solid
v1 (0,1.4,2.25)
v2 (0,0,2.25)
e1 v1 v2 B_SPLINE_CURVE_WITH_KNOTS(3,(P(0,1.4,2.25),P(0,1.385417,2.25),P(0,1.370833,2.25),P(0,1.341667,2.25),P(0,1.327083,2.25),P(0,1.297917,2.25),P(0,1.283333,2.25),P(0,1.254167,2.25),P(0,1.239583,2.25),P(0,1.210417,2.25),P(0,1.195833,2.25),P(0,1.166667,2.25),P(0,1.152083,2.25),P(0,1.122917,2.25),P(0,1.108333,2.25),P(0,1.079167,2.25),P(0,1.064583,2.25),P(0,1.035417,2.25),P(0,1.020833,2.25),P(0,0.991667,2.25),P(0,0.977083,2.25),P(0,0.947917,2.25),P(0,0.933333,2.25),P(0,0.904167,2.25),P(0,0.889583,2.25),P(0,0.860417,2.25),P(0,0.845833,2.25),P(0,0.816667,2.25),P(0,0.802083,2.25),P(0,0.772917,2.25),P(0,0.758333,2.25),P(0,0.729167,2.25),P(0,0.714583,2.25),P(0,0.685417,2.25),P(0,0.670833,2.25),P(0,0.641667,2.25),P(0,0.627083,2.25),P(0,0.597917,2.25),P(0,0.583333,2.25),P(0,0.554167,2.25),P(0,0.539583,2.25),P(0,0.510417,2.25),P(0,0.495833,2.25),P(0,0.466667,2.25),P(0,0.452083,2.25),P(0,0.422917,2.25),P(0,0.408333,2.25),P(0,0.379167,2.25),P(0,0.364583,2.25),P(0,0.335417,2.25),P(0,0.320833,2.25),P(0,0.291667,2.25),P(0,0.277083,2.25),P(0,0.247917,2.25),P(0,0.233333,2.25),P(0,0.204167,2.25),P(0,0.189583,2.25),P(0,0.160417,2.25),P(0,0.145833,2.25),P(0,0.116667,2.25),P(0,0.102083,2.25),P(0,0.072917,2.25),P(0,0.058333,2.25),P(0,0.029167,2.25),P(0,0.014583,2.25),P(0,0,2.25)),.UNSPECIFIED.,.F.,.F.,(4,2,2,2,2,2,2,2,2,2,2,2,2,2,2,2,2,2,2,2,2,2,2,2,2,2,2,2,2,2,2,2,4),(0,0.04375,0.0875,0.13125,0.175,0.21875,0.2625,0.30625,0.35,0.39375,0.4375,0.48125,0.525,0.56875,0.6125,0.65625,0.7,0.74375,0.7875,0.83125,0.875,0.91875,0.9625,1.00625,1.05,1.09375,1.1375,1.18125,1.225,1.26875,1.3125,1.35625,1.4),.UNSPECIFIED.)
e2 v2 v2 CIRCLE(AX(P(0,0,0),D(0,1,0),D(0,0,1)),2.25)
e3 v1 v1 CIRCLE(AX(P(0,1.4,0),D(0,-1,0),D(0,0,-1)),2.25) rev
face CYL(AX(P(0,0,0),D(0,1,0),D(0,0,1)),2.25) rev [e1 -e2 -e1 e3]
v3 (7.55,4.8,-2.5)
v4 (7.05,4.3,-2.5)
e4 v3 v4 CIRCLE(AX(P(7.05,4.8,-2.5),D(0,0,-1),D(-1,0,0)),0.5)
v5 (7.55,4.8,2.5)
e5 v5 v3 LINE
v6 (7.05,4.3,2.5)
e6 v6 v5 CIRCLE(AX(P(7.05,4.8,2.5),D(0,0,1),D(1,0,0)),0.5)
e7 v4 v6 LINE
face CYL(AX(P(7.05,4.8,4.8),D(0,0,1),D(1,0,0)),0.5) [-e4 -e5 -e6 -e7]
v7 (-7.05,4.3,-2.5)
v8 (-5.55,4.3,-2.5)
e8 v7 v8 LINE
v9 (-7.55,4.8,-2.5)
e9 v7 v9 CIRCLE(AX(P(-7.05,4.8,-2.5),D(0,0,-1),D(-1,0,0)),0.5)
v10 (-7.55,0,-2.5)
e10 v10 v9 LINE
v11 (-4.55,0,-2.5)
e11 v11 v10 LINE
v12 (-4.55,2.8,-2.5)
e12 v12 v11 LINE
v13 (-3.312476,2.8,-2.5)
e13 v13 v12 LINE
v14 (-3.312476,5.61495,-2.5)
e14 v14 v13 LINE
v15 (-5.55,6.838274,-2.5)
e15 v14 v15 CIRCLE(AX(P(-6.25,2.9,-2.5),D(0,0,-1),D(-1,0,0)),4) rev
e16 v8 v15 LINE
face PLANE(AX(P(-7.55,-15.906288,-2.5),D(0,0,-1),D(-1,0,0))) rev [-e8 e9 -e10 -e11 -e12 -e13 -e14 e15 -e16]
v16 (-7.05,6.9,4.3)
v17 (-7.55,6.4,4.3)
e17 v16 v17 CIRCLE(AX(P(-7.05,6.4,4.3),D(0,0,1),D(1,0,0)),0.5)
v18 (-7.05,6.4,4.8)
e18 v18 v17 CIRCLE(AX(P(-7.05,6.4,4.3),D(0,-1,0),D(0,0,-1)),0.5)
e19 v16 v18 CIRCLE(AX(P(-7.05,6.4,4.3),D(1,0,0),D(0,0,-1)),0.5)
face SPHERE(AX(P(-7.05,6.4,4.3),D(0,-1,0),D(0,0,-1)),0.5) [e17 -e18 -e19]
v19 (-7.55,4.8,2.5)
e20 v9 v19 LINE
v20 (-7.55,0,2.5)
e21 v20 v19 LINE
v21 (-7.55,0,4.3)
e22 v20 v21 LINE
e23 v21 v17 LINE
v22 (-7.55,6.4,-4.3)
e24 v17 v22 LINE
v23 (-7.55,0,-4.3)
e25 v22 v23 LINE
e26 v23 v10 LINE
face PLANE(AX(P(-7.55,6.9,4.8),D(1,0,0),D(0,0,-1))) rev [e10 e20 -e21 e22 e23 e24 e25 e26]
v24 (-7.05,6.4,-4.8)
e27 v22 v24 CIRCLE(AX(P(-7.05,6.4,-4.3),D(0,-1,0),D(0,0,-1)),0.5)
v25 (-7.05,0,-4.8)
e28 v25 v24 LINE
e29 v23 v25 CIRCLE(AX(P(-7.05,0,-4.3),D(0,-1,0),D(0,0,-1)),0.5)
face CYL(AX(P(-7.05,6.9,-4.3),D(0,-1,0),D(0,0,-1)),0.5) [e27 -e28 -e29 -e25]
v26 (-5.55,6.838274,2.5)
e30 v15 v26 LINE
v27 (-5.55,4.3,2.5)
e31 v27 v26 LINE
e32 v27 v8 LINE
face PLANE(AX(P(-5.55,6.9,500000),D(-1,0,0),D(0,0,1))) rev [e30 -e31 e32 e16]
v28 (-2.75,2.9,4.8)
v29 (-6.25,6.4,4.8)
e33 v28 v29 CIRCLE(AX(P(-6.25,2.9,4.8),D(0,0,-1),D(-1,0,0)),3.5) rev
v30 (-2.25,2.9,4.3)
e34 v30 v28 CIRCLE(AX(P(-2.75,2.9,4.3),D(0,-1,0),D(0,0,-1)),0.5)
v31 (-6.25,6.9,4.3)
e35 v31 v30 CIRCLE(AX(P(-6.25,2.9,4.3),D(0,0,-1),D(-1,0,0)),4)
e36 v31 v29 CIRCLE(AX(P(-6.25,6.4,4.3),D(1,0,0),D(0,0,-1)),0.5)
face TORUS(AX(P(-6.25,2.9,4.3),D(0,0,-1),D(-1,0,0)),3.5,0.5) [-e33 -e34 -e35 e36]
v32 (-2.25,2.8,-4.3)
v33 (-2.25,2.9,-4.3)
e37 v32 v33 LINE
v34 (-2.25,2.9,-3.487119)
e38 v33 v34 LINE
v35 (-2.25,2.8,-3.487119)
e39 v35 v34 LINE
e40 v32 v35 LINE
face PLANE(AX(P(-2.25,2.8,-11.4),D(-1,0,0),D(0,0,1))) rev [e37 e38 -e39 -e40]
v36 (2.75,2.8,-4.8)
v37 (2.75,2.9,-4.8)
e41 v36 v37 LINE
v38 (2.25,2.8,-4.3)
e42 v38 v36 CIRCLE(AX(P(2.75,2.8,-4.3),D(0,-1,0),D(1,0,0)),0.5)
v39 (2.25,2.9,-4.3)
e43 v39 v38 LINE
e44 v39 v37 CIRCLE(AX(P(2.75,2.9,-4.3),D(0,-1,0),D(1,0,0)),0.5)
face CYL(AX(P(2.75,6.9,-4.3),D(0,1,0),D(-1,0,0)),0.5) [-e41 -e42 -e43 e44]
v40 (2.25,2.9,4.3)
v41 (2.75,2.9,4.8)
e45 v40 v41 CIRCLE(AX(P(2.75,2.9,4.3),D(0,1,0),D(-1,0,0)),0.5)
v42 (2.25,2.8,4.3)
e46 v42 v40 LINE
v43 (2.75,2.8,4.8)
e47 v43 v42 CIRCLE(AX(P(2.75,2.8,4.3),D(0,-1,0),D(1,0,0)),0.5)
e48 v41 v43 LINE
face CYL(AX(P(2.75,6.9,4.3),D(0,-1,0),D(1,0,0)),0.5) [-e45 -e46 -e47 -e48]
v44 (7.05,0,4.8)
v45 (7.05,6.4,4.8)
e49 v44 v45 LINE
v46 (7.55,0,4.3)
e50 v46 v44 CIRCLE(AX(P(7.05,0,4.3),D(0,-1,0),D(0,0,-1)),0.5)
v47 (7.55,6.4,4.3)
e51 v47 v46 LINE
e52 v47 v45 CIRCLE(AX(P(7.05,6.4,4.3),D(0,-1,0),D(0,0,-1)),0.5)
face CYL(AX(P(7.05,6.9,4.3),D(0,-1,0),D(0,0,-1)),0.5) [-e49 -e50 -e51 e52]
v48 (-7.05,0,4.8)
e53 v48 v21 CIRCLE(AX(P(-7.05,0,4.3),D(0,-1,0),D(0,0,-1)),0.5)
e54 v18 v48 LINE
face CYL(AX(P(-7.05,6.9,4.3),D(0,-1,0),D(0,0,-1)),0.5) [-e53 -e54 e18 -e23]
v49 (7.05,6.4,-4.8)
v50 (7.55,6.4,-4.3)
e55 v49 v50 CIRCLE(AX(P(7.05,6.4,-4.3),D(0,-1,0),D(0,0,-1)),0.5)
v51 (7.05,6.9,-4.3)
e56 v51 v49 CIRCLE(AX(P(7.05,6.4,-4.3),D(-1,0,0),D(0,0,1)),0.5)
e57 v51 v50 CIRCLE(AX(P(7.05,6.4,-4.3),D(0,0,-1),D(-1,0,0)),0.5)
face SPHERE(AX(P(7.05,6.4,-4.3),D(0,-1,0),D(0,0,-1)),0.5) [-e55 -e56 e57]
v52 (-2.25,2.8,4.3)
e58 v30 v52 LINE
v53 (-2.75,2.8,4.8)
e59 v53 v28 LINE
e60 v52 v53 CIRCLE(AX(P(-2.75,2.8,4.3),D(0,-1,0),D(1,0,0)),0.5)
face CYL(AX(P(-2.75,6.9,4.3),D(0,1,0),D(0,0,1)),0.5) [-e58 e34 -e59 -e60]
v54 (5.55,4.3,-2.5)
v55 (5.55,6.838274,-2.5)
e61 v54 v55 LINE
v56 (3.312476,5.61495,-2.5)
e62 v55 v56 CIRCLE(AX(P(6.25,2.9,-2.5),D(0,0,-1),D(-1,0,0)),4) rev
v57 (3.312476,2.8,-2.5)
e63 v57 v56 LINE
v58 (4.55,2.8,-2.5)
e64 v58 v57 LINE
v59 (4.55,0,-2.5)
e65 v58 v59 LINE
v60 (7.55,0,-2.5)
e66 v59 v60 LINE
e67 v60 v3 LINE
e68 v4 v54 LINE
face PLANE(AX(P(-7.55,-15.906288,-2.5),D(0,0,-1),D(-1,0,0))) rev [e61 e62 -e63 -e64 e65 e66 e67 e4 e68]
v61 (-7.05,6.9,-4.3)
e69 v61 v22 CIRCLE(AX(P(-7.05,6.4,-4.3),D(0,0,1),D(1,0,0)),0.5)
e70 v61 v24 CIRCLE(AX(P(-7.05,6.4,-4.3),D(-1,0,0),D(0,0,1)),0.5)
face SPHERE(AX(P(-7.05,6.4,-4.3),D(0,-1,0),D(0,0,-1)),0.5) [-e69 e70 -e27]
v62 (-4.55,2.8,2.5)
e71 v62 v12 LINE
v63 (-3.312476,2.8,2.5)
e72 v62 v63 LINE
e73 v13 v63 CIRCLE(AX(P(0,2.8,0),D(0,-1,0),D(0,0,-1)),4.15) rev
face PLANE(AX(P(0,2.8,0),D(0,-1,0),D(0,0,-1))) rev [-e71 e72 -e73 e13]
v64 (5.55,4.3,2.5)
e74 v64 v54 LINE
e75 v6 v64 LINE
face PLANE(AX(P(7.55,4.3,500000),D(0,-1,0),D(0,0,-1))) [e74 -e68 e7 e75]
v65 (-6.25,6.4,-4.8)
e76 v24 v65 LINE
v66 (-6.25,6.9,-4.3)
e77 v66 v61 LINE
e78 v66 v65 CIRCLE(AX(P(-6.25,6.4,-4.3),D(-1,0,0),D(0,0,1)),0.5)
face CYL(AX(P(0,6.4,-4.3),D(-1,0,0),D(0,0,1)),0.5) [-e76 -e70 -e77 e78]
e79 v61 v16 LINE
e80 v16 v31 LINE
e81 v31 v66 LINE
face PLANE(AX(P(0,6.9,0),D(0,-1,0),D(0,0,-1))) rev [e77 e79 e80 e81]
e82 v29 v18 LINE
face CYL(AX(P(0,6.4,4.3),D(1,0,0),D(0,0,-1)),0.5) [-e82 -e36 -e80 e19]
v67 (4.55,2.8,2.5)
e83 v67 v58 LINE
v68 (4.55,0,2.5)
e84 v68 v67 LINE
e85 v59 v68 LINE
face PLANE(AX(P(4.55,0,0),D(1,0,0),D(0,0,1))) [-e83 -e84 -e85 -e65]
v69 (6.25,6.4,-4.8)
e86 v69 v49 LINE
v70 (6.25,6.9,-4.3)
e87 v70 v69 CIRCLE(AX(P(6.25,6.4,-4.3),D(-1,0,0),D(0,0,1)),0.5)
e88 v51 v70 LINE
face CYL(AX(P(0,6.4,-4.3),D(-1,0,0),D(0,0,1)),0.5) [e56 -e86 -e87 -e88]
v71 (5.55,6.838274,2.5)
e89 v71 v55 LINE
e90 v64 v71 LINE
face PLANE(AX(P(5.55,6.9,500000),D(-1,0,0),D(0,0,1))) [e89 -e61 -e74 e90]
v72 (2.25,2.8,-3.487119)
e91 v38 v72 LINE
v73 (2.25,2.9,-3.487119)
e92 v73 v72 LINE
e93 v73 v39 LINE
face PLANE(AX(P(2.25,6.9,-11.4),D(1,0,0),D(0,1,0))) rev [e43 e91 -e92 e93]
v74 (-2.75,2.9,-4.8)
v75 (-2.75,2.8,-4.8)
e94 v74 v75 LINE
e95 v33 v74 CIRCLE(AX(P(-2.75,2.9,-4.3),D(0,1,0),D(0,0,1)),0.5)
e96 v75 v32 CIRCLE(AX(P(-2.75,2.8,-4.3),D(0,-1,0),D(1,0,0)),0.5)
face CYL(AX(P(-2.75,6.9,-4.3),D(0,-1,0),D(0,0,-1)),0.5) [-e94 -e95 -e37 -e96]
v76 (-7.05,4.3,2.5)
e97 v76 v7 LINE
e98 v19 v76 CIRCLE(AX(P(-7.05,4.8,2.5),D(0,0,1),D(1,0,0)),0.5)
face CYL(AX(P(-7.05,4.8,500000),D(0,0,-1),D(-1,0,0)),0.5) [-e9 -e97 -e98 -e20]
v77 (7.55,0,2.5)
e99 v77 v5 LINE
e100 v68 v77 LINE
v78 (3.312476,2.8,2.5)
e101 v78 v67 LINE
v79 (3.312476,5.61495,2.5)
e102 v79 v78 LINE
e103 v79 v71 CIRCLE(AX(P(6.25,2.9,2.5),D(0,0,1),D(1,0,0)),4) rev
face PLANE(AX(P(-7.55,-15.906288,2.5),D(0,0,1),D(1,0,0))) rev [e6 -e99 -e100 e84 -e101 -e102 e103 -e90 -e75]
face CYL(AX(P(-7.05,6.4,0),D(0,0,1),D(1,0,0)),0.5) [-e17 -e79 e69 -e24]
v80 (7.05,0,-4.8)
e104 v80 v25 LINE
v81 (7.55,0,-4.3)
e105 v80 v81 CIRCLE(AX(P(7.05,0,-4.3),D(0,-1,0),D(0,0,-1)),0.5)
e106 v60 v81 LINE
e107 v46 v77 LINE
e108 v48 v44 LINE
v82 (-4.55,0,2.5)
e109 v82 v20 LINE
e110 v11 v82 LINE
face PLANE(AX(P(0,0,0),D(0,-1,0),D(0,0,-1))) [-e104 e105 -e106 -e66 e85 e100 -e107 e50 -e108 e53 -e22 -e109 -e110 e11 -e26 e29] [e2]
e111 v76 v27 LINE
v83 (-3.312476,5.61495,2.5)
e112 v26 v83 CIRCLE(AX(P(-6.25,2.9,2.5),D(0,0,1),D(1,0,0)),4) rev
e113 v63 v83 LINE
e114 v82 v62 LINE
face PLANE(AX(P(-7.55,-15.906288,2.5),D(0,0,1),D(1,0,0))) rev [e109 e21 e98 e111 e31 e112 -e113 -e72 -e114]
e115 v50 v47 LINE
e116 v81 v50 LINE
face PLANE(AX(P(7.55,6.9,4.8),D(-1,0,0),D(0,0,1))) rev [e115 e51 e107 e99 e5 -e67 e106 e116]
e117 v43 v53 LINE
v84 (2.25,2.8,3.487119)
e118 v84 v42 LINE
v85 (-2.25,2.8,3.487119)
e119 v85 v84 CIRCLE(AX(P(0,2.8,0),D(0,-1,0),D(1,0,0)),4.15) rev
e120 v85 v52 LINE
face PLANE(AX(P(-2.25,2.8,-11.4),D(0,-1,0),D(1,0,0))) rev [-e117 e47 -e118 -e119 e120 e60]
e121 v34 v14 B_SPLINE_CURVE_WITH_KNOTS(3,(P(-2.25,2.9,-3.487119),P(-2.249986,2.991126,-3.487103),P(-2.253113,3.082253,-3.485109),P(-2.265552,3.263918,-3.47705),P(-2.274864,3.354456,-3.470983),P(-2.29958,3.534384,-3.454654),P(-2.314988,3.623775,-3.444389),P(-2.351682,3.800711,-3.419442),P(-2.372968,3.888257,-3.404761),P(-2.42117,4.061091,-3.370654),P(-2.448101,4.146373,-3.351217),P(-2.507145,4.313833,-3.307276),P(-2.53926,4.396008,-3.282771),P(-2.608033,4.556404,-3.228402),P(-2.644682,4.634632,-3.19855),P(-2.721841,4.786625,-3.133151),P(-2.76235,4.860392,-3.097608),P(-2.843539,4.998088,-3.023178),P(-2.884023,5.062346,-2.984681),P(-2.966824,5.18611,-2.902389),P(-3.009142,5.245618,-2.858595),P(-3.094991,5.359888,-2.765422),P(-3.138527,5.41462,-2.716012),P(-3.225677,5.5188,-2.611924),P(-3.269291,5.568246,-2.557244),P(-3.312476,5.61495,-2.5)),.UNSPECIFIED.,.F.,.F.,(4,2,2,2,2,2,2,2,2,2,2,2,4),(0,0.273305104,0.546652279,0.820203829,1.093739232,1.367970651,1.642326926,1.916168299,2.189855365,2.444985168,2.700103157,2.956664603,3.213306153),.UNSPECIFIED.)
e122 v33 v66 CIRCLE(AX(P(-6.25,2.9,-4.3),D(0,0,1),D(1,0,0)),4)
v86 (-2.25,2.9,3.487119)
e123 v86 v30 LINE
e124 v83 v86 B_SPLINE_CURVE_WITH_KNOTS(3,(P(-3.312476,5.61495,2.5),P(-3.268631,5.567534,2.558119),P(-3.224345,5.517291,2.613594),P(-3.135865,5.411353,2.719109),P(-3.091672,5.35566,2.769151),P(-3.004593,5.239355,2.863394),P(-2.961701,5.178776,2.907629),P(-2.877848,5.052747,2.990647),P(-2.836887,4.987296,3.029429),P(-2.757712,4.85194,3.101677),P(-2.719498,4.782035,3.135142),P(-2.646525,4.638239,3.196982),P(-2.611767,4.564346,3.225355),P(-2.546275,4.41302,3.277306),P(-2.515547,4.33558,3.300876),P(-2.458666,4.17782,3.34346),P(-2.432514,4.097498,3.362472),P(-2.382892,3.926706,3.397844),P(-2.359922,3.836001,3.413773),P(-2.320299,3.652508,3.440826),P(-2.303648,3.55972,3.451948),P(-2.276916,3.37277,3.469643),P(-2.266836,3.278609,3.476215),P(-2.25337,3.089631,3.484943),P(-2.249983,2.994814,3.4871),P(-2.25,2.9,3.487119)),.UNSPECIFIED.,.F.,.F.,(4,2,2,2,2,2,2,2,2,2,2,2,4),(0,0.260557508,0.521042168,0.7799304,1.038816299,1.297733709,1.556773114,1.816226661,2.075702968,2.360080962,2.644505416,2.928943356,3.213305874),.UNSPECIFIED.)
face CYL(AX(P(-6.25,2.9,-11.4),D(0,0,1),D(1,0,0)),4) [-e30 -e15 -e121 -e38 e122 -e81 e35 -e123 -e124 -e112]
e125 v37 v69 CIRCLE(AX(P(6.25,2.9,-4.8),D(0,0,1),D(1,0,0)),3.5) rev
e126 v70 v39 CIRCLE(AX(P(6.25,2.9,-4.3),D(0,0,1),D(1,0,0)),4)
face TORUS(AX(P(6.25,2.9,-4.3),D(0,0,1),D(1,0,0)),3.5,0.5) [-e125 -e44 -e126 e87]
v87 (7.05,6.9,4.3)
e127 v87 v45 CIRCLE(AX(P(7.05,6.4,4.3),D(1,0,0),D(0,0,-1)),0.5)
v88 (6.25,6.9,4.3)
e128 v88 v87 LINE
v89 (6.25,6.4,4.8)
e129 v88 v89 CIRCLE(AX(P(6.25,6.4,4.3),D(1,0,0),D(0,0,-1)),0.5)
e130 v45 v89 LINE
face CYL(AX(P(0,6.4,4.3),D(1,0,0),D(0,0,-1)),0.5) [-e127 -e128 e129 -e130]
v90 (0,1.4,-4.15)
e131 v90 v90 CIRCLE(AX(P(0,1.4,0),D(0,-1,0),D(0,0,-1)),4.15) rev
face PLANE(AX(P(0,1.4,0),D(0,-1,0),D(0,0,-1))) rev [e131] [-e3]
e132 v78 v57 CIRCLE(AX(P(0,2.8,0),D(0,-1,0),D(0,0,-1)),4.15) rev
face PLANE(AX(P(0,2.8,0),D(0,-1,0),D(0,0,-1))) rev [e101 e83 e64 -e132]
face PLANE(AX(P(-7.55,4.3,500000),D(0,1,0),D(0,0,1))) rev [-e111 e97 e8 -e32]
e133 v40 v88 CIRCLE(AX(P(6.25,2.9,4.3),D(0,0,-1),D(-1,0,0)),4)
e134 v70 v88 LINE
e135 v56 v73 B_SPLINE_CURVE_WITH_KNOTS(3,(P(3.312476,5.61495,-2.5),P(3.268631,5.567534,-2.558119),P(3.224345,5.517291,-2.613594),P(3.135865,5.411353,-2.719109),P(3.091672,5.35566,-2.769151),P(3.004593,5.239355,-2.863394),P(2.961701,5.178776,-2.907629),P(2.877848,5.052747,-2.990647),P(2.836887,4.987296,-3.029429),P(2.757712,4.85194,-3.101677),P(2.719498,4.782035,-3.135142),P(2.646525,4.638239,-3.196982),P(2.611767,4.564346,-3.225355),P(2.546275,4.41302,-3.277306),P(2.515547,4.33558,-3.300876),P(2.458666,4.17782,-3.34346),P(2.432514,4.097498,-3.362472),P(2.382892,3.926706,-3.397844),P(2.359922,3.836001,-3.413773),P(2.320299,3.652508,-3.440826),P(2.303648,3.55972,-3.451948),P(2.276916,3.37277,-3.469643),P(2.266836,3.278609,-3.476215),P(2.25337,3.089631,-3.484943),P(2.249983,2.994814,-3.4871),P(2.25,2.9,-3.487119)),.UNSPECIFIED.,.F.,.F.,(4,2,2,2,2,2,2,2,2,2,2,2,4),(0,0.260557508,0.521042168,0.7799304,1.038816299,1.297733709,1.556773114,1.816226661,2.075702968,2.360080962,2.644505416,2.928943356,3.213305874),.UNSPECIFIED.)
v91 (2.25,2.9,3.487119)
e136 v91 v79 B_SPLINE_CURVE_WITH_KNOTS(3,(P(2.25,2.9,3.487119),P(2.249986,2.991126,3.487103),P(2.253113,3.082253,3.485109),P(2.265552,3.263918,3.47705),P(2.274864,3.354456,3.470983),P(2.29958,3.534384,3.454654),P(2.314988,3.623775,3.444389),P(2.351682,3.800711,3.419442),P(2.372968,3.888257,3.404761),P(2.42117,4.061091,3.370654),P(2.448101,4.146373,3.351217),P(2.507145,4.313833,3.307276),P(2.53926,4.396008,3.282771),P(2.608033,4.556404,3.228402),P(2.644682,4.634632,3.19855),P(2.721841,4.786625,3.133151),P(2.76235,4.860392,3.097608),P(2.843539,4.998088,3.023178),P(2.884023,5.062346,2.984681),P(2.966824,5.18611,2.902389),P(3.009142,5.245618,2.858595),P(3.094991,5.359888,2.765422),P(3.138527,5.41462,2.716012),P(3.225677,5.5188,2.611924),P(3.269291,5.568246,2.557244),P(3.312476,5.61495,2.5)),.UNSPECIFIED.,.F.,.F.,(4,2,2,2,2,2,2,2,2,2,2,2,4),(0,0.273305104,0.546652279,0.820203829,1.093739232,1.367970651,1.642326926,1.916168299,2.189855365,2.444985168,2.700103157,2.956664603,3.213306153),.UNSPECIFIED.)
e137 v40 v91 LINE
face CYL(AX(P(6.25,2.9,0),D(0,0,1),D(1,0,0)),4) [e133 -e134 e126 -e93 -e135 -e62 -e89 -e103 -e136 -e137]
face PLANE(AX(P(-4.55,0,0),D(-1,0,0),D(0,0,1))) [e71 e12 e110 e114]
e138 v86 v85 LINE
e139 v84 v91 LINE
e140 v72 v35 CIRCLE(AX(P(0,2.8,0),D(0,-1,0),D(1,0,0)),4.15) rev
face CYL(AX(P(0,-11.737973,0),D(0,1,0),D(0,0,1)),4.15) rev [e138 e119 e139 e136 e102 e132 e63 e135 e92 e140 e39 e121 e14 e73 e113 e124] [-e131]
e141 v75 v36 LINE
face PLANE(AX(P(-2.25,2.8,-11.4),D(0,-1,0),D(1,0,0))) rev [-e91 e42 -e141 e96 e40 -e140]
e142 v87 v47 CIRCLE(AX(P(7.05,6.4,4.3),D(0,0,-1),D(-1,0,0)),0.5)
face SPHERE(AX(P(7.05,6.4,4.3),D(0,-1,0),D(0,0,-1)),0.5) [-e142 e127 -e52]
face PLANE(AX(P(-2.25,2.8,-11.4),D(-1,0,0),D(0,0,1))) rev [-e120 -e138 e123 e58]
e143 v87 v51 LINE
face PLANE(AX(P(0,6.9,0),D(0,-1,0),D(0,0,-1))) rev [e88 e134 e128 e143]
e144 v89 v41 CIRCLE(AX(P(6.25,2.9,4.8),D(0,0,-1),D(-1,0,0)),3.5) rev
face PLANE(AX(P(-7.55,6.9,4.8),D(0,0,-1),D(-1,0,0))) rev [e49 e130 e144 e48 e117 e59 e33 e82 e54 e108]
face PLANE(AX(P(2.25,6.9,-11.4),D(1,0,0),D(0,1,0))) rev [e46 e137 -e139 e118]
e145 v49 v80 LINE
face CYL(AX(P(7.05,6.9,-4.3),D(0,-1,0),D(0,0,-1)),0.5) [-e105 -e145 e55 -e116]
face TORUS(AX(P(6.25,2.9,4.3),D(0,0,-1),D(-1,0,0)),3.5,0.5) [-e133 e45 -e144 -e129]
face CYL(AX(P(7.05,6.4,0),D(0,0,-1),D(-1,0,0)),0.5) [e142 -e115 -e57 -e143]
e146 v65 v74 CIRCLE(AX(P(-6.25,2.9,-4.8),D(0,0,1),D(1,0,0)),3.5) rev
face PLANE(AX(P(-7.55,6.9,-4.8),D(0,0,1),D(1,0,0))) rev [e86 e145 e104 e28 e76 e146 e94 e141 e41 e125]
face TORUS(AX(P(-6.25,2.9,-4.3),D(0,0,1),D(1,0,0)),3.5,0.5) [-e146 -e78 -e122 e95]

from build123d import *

# Parameters (mm, degrees)
SKETCH1_W           = 15.1
SKETCH1_H           = 9.6
BOSS_EXTRUDE1_DEPTH = 6.9
SKETCH3_R           = 2.25
CUT_EXTRUDE1_DEPTH  = 12.298340586
SKETCH4_R           = 4.15
CUT_EXTRUDE2_DEPTH  = 5.5
SKETCH5_W           = 15.1
SKETCH5_H           = 5
CUT_EXTRUDE3_DEPTH  = 4.1
SKETCH6_W           = 4.5
SKETCH6_H           = 4.1
CUT_EXTRUDE4_DEPTH  = 11.4
SKETCH9_W           = 5
SKETCH9_H           = 2.8
CUT_EXTRUDE5_DEPTH  = 3
FILLET3_R           = 0.5
BOSS_EXTRUDE2_REACH = 14.566
SKETCH10_W          = 2
SKETCH10_H          = 2.6
FILLET4_R           = 4
FILLET5_R           = 0.5
FILLET6_R           = 0.5


with BuildPart() as part:
    # Sketch1 → Boss-Extrude1 (new body)
    with BuildSketch(Plane(origin=(0, 0, 0), x_dir=(1, 0, 0), z_dir=(0, 1, 0))):
        Rectangle(SKETCH1_W, SKETCH1_H)
    extrude(amount=BOSS_EXTRUDE1_DEPTH)

    # Sketch3 → Cut-Extrude1 (cut, through all)
    with BuildSketch(Plane(origin=(0, 6.9, 0), x_dir=(1, 0, 0), z_dir=(0, 1, 0))):
        with Locations(Location((0, 0, 0), (0, 0, 270))):
            Circle(SKETCH3_R)
    extrude(amount=-CUT_EXTRUDE1_DEPTH, mode=Mode.SUBTRACT)

    # Sketch4 → Cut-Extrude2 (cut)
    with BuildSketch(Plane(origin=(0, 6.9, 0), x_dir=(1, 0, 0), z_dir=(0, 1, 0))):
        with Locations(Location((0, 0, 0), (0, 0, 270))):
            Circle(SKETCH4_R)
    extrude(amount=-CUT_EXTRUDE2_DEPTH, mode=Mode.SUBTRACT)

    # Sketch5 → Cut-Extrude3 (cut)
    with BuildSketch(Plane(origin=(0, 6.9, 0), x_dir=(1, 0, 0), z_dir=(0, 1, 0))):
        Rectangle(SKETCH5_W, SKETCH5_H)
    extrude(amount=-CUT_EXTRUDE3_DEPTH, mode=Mode.SUBTRACT)

    # Sketch6 → Cut-Extrude4 (cut, symmetric)
    with BuildSketch(Plane.XY):
        with Locations((0, 4.85)):
            Rectangle(SKETCH6_W, SKETCH6_H)
    extrude(amount=CUT_EXTRUDE4_DEPTH, both=True, mode=Mode.SUBTRACT)

    # Sketch9 → Cut-Extrude5 (cut)
    with BuildSketch(Plane.ZY.offset(7.55)):
        with Locations((0, 1.4)):
            Rectangle(SKETCH9_W, SKETCH9_H)
    cut_extrude5 = extrude(amount=-CUT_EXTRUDE5_DEPTH, mode=Mode.SUBTRACT)

    # Fillet3
    fillet3_edges = [part.edges().sort_by_distance(p)[0] for p in [
        (7.55, 3.45, 4.8),
        (-7.55, 3.45, 4.8),
        (-7.55, 3.45, -4.8),
        (7.55, 3.45, -4.8),
    ]]
    fillet(fillet3_edges, radius=FILLET3_R)

    # Sketch10 → Boss-Extrude2 (add, up to next)
    with BuildSketch(Plane.XY.offset(-2.5), mode=Mode.PRIVATE) as boss_extrude2_sk1:
        with Locations((-6.55, 5.6)):
            Rectangle(SKETCH10_W, SKETCH10_H)
    boss_extrude2_tool1 = extrude(boss_extrude2_sk1.sketch, amount=BOSS_EXTRUDE2_REACH, mode=Mode.PRIVATE) - part.part
    boss_extrude2 = boss_extrude2_tool1.solids().sort_by_distance((-6.55, 5.6, -2.5))[0]
    add(boss_extrude2)

    # Mirror1: Cut-Extrude5, Boss-Extrude2 across plane
    add(cut_extrude5.mirror(Plane(origin=(0, 0, 0), x_dir=(0, 0, 1), z_dir=(1, 0, 0))), mode=Mode.SUBTRACT)
    add(boss_extrude2.mirror(Plane(origin=(0, 0, 0), x_dir=(0, 0, 1), z_dir=(1, 0, 0))))

    # Fillet4
    # the kernel refuses this fillet: 4 mm, written as the material it takes off along each edge
    with BuildSketch(Plane(origin=(2.25, 6.9, -14.8), x_dir=(0, -1, 0), z_dir=(0, 0, 1)), Plane(origin=(-2.25, 6.9, 6.512880845), x_dir=(0, -1, 0), z_dir=(0, 0, -1))) as fillet4_piece_1:
        with BuildLine():
            CenterArc((FILLET4_R, FILLET4_R), FILLET4_R, 180, 90)
            Line((0, FILLET4_R), (0, 0))
            Line((0, 0), (FILLET4_R, 0))
        make_face()
    extrude(amount=21.312880845, mode=Mode.SUBTRACT)

    # Fillet5
    fillet5_edges = [part.edges().sort_by_distance(p)[0] for p in [
        (6.65, 6.9, -4.8),
        (7.403553391, 6.9, -4.653553391),
        (-6.65, 6.9, 4.8),
        (7.403553391, 6.9, 4.653553391),
        (-7.403553391, 6.9, 4.653553391),
        (-7.403553391, 6.9, -4.653553391),
        (6.65, 6.9, 4.8),
        (2.25, 2.85, 4.8),
        (3.421572875, 5.728427125, 4.8),
        (-3.421572875, 5.728427125, 4.8),
        (-6.65, 6.9, -4.8),
        (-2.25, 2.85, -4.8),
        (-3.421572875, 5.728427125, -4.8),
        (3.421572875, 5.728427125, -4.8),
        (7.55, 6.9, 0),
        (-7.55, 6.9, 0),
        (-2.25, 2.85, 4.8),
        (2.25, 2.85, -4.8),
    ]]
    fillet(fillet5_edges, radius=FILLET5_R)

    # Fillet6
    fillet6_edges = [part.edges().sort_by_distance(p)[0] for p in [
        (-7.55, 4.3, 0),
        (7.55, 4.3, 0),
    ]]
    fillet(fillet6_edges, radius=FILLET6_R)


solid = part.part
